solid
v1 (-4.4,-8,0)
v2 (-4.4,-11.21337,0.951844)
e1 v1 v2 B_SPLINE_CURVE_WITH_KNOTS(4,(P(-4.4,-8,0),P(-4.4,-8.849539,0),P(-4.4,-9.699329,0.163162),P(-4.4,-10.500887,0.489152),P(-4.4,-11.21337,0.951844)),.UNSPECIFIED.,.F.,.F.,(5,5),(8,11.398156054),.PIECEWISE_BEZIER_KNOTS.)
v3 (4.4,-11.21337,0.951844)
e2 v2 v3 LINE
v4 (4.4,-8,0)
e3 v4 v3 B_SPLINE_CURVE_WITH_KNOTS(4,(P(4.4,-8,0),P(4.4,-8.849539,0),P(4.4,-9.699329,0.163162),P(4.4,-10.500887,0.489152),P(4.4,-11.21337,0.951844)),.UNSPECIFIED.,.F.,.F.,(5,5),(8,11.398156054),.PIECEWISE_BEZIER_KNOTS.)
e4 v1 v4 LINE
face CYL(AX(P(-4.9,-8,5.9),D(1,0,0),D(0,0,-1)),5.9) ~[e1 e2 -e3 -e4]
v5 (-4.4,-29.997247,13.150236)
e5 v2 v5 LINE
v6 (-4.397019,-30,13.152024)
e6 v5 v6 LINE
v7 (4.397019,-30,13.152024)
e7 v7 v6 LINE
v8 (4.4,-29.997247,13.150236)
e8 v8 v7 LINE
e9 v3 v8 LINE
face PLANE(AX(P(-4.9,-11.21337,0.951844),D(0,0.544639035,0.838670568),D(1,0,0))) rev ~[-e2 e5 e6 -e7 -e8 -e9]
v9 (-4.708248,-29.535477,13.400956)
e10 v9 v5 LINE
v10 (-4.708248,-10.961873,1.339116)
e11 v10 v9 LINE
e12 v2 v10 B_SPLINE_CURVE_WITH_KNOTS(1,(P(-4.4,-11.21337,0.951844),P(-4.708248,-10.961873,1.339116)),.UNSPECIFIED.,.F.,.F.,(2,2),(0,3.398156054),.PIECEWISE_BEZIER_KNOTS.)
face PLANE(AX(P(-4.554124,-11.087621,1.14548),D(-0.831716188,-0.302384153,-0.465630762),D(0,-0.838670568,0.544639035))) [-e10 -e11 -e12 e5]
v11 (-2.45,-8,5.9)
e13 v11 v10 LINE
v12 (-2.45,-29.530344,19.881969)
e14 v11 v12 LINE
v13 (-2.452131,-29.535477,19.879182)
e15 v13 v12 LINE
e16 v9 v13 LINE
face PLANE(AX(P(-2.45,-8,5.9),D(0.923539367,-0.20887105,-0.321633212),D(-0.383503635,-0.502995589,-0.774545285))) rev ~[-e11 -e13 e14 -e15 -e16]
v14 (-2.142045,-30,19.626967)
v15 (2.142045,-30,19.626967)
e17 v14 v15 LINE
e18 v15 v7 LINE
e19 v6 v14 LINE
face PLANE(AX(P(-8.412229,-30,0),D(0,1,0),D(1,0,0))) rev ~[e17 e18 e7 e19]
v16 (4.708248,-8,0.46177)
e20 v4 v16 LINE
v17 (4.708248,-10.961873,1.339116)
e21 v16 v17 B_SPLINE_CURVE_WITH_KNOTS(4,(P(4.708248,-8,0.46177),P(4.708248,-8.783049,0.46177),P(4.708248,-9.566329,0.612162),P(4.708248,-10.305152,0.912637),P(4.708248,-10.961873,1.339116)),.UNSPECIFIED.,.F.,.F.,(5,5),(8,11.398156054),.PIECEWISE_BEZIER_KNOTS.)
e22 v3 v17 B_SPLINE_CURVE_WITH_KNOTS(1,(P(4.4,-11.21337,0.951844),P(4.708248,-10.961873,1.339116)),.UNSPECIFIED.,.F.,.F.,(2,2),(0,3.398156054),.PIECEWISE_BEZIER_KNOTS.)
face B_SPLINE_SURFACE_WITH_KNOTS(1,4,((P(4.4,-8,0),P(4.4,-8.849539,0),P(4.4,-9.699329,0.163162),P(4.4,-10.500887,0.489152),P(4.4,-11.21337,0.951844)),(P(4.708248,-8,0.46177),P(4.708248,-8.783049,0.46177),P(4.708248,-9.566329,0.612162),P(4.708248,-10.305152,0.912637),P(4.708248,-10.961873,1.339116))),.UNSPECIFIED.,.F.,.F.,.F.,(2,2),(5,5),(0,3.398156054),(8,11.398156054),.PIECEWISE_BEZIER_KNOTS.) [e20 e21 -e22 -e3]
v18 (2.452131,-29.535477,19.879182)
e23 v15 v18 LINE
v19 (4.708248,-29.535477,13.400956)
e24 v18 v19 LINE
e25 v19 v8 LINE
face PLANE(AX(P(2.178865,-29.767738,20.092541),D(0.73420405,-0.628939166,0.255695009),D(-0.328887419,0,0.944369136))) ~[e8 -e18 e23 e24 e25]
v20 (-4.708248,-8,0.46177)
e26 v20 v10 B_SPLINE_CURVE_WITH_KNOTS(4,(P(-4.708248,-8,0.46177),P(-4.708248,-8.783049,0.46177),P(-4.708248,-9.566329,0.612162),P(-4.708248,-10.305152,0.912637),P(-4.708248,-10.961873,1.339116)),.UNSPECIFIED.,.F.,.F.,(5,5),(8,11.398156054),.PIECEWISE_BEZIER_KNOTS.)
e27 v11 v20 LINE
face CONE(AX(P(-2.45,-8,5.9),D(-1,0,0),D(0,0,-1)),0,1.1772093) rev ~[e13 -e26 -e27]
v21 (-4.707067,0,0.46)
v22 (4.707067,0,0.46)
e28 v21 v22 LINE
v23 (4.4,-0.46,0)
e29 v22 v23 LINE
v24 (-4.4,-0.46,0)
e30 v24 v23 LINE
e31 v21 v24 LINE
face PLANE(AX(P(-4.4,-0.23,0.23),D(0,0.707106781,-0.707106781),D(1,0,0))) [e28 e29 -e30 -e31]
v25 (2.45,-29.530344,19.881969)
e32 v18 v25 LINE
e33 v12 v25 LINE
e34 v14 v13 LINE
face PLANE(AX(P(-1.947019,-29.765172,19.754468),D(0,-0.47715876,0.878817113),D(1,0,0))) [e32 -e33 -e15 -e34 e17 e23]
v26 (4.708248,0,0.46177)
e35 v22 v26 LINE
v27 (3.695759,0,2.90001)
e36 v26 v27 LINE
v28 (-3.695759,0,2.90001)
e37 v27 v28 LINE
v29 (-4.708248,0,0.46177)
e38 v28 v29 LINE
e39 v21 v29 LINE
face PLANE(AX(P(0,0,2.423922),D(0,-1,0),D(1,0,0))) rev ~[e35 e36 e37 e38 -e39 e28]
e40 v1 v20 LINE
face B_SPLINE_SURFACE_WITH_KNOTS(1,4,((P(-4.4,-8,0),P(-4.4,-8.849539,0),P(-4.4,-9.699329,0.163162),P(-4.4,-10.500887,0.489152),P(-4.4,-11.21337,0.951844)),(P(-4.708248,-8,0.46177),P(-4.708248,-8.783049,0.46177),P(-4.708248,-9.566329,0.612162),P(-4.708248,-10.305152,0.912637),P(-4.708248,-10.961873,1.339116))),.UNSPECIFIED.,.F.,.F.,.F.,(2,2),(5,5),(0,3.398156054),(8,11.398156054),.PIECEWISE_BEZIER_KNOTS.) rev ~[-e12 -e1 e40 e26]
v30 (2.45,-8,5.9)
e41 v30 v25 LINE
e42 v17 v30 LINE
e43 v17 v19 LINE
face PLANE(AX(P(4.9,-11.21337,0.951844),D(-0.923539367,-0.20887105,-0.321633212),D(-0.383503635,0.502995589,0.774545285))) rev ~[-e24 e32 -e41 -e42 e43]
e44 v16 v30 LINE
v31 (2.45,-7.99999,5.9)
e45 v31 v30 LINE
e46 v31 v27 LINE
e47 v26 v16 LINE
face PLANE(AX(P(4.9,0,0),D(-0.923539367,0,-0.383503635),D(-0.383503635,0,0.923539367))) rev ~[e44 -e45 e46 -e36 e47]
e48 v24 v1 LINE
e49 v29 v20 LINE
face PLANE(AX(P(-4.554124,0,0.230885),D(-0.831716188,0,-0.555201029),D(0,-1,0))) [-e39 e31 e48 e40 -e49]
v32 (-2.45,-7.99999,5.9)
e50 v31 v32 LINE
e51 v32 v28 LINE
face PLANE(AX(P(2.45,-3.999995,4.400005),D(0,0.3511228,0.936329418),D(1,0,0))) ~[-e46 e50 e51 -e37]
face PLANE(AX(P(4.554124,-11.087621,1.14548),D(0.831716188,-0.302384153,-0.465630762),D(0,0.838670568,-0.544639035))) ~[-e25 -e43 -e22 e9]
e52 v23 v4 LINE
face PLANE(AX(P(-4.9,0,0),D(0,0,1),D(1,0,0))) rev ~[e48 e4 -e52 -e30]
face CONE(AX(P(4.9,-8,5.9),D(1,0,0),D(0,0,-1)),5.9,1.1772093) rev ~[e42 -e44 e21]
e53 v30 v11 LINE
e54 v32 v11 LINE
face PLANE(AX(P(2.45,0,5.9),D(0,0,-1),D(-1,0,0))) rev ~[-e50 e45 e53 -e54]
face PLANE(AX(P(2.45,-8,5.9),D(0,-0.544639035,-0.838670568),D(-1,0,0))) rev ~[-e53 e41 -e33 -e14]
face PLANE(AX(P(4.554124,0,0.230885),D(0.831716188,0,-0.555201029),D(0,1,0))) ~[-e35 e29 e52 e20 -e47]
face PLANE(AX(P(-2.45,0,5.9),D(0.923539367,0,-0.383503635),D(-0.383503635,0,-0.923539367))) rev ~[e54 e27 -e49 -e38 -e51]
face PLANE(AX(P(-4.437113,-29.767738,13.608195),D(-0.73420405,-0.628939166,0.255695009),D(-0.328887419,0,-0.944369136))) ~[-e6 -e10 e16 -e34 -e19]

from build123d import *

# Parameters (mm, degrees)
F1_DEPTH  = 8
F3_ANGLE  = 33
F6_DEPTH  = 26.5
F7_W      = 18.4942251071
F7_H      = 9.6429027617
F8_DEPTH  = 25
F9_SIZE   = 0.5
F10_SIZE2 = 2.99999
F10_SIZE  = 7.99999
F11_SIZE  = 0.46
F12_SIZE  = 0.475
F13_SIZE  = 0.56


# Not quite as in the source:
# - a fillet or chamfer is up to 0.001 mm smaller than in the source, because OpenCascade refuses the exact size


with BuildPart() as f1:
    # F0 (on Front) → F1 (new body)
    with BuildSketch(Plane.XZ):
        Polygon((-2.45, 5.9), (-4.9, 0), (4.9, 0), (2.45, 5.9), align=None)
    extrude(amount=F1_DEPTH)

    # F2 (on face) → F3 (revolve)
    with BuildSketch(Plane.XZ.offset(8)):
        Polygon((4.9, 0), (2.45, 5.9), (-2.45, 5.9), (-4.9, 0), align=None)
    revolve(axis=Axis((0, -8, 5.9), (-1, 0, 0)), revolution_arc=F3_ANGLE)

    # F4 (on face) → F6 (join)
    with BuildSketch(Plane(origin=(0, -8.3219056723, 5.4043087335), x_dir=(1, 0, 0), z_dir=(0, -0.8386705679, 0.544639035))):
        Polygon((-4.9, -5.3089559292), (4.9, -5.3089559292), (2.45, 0.5910440708), (-2.45, 0.5910440708), align=None)
    extrude(amount=F6_DEPTH)

    # F7 (on Top) → F8 (cut)
    with BuildSketch(Plane.XY):
        with Locations((0.8348836564, -34.8214513808)):
            Rectangle(F7_W, F7_H)
    extrude(amount=F8_DEPTH, mode=Mode.SUBTRACT)

    # F9
    f9_edges = [f1.edges().sort_by_distance(p)[0] for p in [
        (4.9, -4, 0),
        (-4.9, -4, 0),
    ]]
    chamfer(f9_edges, length=F9_SIZE)

    # F10 (size 8 and 3 in the source; OpenCascade refuses exactly that, so slightly less here)
    f10_edges = [f1.edges().sort_by_distance(p)[0] for p in [
        (0, 0, 5.9),
    ]]
    f10_side = f1.faces().sort_by_distance((0, -4, 5.9))[0]
    chamfer(f10_edges, length=F10_SIZE, length2=F10_SIZE2, reference=f10_side)

    # F11
    f11_edges = [f1.edges().sort_by_distance(p)[0] for p in [
        (0, 0, 0),
    ]]
    chamfer(f11_edges, length=F11_SIZE)

    # F12
    f12_edges = [f1.edges().sort_by_distance(p)[0] for p in [
        (-3.579124, -30, 16.944794),
        (3.579124, -30, 16.944794),
    ]]
    chamfer(f12_edges, length=F12_SIZE)

    # F13
    f13_edges = [f1.edges().sort_by_distance(p)[0] for p in [
        (0, -30, 20.186967),
    ]]
    chamfer(f13_edges, length=F13_SIZE)


solid = f1.part
